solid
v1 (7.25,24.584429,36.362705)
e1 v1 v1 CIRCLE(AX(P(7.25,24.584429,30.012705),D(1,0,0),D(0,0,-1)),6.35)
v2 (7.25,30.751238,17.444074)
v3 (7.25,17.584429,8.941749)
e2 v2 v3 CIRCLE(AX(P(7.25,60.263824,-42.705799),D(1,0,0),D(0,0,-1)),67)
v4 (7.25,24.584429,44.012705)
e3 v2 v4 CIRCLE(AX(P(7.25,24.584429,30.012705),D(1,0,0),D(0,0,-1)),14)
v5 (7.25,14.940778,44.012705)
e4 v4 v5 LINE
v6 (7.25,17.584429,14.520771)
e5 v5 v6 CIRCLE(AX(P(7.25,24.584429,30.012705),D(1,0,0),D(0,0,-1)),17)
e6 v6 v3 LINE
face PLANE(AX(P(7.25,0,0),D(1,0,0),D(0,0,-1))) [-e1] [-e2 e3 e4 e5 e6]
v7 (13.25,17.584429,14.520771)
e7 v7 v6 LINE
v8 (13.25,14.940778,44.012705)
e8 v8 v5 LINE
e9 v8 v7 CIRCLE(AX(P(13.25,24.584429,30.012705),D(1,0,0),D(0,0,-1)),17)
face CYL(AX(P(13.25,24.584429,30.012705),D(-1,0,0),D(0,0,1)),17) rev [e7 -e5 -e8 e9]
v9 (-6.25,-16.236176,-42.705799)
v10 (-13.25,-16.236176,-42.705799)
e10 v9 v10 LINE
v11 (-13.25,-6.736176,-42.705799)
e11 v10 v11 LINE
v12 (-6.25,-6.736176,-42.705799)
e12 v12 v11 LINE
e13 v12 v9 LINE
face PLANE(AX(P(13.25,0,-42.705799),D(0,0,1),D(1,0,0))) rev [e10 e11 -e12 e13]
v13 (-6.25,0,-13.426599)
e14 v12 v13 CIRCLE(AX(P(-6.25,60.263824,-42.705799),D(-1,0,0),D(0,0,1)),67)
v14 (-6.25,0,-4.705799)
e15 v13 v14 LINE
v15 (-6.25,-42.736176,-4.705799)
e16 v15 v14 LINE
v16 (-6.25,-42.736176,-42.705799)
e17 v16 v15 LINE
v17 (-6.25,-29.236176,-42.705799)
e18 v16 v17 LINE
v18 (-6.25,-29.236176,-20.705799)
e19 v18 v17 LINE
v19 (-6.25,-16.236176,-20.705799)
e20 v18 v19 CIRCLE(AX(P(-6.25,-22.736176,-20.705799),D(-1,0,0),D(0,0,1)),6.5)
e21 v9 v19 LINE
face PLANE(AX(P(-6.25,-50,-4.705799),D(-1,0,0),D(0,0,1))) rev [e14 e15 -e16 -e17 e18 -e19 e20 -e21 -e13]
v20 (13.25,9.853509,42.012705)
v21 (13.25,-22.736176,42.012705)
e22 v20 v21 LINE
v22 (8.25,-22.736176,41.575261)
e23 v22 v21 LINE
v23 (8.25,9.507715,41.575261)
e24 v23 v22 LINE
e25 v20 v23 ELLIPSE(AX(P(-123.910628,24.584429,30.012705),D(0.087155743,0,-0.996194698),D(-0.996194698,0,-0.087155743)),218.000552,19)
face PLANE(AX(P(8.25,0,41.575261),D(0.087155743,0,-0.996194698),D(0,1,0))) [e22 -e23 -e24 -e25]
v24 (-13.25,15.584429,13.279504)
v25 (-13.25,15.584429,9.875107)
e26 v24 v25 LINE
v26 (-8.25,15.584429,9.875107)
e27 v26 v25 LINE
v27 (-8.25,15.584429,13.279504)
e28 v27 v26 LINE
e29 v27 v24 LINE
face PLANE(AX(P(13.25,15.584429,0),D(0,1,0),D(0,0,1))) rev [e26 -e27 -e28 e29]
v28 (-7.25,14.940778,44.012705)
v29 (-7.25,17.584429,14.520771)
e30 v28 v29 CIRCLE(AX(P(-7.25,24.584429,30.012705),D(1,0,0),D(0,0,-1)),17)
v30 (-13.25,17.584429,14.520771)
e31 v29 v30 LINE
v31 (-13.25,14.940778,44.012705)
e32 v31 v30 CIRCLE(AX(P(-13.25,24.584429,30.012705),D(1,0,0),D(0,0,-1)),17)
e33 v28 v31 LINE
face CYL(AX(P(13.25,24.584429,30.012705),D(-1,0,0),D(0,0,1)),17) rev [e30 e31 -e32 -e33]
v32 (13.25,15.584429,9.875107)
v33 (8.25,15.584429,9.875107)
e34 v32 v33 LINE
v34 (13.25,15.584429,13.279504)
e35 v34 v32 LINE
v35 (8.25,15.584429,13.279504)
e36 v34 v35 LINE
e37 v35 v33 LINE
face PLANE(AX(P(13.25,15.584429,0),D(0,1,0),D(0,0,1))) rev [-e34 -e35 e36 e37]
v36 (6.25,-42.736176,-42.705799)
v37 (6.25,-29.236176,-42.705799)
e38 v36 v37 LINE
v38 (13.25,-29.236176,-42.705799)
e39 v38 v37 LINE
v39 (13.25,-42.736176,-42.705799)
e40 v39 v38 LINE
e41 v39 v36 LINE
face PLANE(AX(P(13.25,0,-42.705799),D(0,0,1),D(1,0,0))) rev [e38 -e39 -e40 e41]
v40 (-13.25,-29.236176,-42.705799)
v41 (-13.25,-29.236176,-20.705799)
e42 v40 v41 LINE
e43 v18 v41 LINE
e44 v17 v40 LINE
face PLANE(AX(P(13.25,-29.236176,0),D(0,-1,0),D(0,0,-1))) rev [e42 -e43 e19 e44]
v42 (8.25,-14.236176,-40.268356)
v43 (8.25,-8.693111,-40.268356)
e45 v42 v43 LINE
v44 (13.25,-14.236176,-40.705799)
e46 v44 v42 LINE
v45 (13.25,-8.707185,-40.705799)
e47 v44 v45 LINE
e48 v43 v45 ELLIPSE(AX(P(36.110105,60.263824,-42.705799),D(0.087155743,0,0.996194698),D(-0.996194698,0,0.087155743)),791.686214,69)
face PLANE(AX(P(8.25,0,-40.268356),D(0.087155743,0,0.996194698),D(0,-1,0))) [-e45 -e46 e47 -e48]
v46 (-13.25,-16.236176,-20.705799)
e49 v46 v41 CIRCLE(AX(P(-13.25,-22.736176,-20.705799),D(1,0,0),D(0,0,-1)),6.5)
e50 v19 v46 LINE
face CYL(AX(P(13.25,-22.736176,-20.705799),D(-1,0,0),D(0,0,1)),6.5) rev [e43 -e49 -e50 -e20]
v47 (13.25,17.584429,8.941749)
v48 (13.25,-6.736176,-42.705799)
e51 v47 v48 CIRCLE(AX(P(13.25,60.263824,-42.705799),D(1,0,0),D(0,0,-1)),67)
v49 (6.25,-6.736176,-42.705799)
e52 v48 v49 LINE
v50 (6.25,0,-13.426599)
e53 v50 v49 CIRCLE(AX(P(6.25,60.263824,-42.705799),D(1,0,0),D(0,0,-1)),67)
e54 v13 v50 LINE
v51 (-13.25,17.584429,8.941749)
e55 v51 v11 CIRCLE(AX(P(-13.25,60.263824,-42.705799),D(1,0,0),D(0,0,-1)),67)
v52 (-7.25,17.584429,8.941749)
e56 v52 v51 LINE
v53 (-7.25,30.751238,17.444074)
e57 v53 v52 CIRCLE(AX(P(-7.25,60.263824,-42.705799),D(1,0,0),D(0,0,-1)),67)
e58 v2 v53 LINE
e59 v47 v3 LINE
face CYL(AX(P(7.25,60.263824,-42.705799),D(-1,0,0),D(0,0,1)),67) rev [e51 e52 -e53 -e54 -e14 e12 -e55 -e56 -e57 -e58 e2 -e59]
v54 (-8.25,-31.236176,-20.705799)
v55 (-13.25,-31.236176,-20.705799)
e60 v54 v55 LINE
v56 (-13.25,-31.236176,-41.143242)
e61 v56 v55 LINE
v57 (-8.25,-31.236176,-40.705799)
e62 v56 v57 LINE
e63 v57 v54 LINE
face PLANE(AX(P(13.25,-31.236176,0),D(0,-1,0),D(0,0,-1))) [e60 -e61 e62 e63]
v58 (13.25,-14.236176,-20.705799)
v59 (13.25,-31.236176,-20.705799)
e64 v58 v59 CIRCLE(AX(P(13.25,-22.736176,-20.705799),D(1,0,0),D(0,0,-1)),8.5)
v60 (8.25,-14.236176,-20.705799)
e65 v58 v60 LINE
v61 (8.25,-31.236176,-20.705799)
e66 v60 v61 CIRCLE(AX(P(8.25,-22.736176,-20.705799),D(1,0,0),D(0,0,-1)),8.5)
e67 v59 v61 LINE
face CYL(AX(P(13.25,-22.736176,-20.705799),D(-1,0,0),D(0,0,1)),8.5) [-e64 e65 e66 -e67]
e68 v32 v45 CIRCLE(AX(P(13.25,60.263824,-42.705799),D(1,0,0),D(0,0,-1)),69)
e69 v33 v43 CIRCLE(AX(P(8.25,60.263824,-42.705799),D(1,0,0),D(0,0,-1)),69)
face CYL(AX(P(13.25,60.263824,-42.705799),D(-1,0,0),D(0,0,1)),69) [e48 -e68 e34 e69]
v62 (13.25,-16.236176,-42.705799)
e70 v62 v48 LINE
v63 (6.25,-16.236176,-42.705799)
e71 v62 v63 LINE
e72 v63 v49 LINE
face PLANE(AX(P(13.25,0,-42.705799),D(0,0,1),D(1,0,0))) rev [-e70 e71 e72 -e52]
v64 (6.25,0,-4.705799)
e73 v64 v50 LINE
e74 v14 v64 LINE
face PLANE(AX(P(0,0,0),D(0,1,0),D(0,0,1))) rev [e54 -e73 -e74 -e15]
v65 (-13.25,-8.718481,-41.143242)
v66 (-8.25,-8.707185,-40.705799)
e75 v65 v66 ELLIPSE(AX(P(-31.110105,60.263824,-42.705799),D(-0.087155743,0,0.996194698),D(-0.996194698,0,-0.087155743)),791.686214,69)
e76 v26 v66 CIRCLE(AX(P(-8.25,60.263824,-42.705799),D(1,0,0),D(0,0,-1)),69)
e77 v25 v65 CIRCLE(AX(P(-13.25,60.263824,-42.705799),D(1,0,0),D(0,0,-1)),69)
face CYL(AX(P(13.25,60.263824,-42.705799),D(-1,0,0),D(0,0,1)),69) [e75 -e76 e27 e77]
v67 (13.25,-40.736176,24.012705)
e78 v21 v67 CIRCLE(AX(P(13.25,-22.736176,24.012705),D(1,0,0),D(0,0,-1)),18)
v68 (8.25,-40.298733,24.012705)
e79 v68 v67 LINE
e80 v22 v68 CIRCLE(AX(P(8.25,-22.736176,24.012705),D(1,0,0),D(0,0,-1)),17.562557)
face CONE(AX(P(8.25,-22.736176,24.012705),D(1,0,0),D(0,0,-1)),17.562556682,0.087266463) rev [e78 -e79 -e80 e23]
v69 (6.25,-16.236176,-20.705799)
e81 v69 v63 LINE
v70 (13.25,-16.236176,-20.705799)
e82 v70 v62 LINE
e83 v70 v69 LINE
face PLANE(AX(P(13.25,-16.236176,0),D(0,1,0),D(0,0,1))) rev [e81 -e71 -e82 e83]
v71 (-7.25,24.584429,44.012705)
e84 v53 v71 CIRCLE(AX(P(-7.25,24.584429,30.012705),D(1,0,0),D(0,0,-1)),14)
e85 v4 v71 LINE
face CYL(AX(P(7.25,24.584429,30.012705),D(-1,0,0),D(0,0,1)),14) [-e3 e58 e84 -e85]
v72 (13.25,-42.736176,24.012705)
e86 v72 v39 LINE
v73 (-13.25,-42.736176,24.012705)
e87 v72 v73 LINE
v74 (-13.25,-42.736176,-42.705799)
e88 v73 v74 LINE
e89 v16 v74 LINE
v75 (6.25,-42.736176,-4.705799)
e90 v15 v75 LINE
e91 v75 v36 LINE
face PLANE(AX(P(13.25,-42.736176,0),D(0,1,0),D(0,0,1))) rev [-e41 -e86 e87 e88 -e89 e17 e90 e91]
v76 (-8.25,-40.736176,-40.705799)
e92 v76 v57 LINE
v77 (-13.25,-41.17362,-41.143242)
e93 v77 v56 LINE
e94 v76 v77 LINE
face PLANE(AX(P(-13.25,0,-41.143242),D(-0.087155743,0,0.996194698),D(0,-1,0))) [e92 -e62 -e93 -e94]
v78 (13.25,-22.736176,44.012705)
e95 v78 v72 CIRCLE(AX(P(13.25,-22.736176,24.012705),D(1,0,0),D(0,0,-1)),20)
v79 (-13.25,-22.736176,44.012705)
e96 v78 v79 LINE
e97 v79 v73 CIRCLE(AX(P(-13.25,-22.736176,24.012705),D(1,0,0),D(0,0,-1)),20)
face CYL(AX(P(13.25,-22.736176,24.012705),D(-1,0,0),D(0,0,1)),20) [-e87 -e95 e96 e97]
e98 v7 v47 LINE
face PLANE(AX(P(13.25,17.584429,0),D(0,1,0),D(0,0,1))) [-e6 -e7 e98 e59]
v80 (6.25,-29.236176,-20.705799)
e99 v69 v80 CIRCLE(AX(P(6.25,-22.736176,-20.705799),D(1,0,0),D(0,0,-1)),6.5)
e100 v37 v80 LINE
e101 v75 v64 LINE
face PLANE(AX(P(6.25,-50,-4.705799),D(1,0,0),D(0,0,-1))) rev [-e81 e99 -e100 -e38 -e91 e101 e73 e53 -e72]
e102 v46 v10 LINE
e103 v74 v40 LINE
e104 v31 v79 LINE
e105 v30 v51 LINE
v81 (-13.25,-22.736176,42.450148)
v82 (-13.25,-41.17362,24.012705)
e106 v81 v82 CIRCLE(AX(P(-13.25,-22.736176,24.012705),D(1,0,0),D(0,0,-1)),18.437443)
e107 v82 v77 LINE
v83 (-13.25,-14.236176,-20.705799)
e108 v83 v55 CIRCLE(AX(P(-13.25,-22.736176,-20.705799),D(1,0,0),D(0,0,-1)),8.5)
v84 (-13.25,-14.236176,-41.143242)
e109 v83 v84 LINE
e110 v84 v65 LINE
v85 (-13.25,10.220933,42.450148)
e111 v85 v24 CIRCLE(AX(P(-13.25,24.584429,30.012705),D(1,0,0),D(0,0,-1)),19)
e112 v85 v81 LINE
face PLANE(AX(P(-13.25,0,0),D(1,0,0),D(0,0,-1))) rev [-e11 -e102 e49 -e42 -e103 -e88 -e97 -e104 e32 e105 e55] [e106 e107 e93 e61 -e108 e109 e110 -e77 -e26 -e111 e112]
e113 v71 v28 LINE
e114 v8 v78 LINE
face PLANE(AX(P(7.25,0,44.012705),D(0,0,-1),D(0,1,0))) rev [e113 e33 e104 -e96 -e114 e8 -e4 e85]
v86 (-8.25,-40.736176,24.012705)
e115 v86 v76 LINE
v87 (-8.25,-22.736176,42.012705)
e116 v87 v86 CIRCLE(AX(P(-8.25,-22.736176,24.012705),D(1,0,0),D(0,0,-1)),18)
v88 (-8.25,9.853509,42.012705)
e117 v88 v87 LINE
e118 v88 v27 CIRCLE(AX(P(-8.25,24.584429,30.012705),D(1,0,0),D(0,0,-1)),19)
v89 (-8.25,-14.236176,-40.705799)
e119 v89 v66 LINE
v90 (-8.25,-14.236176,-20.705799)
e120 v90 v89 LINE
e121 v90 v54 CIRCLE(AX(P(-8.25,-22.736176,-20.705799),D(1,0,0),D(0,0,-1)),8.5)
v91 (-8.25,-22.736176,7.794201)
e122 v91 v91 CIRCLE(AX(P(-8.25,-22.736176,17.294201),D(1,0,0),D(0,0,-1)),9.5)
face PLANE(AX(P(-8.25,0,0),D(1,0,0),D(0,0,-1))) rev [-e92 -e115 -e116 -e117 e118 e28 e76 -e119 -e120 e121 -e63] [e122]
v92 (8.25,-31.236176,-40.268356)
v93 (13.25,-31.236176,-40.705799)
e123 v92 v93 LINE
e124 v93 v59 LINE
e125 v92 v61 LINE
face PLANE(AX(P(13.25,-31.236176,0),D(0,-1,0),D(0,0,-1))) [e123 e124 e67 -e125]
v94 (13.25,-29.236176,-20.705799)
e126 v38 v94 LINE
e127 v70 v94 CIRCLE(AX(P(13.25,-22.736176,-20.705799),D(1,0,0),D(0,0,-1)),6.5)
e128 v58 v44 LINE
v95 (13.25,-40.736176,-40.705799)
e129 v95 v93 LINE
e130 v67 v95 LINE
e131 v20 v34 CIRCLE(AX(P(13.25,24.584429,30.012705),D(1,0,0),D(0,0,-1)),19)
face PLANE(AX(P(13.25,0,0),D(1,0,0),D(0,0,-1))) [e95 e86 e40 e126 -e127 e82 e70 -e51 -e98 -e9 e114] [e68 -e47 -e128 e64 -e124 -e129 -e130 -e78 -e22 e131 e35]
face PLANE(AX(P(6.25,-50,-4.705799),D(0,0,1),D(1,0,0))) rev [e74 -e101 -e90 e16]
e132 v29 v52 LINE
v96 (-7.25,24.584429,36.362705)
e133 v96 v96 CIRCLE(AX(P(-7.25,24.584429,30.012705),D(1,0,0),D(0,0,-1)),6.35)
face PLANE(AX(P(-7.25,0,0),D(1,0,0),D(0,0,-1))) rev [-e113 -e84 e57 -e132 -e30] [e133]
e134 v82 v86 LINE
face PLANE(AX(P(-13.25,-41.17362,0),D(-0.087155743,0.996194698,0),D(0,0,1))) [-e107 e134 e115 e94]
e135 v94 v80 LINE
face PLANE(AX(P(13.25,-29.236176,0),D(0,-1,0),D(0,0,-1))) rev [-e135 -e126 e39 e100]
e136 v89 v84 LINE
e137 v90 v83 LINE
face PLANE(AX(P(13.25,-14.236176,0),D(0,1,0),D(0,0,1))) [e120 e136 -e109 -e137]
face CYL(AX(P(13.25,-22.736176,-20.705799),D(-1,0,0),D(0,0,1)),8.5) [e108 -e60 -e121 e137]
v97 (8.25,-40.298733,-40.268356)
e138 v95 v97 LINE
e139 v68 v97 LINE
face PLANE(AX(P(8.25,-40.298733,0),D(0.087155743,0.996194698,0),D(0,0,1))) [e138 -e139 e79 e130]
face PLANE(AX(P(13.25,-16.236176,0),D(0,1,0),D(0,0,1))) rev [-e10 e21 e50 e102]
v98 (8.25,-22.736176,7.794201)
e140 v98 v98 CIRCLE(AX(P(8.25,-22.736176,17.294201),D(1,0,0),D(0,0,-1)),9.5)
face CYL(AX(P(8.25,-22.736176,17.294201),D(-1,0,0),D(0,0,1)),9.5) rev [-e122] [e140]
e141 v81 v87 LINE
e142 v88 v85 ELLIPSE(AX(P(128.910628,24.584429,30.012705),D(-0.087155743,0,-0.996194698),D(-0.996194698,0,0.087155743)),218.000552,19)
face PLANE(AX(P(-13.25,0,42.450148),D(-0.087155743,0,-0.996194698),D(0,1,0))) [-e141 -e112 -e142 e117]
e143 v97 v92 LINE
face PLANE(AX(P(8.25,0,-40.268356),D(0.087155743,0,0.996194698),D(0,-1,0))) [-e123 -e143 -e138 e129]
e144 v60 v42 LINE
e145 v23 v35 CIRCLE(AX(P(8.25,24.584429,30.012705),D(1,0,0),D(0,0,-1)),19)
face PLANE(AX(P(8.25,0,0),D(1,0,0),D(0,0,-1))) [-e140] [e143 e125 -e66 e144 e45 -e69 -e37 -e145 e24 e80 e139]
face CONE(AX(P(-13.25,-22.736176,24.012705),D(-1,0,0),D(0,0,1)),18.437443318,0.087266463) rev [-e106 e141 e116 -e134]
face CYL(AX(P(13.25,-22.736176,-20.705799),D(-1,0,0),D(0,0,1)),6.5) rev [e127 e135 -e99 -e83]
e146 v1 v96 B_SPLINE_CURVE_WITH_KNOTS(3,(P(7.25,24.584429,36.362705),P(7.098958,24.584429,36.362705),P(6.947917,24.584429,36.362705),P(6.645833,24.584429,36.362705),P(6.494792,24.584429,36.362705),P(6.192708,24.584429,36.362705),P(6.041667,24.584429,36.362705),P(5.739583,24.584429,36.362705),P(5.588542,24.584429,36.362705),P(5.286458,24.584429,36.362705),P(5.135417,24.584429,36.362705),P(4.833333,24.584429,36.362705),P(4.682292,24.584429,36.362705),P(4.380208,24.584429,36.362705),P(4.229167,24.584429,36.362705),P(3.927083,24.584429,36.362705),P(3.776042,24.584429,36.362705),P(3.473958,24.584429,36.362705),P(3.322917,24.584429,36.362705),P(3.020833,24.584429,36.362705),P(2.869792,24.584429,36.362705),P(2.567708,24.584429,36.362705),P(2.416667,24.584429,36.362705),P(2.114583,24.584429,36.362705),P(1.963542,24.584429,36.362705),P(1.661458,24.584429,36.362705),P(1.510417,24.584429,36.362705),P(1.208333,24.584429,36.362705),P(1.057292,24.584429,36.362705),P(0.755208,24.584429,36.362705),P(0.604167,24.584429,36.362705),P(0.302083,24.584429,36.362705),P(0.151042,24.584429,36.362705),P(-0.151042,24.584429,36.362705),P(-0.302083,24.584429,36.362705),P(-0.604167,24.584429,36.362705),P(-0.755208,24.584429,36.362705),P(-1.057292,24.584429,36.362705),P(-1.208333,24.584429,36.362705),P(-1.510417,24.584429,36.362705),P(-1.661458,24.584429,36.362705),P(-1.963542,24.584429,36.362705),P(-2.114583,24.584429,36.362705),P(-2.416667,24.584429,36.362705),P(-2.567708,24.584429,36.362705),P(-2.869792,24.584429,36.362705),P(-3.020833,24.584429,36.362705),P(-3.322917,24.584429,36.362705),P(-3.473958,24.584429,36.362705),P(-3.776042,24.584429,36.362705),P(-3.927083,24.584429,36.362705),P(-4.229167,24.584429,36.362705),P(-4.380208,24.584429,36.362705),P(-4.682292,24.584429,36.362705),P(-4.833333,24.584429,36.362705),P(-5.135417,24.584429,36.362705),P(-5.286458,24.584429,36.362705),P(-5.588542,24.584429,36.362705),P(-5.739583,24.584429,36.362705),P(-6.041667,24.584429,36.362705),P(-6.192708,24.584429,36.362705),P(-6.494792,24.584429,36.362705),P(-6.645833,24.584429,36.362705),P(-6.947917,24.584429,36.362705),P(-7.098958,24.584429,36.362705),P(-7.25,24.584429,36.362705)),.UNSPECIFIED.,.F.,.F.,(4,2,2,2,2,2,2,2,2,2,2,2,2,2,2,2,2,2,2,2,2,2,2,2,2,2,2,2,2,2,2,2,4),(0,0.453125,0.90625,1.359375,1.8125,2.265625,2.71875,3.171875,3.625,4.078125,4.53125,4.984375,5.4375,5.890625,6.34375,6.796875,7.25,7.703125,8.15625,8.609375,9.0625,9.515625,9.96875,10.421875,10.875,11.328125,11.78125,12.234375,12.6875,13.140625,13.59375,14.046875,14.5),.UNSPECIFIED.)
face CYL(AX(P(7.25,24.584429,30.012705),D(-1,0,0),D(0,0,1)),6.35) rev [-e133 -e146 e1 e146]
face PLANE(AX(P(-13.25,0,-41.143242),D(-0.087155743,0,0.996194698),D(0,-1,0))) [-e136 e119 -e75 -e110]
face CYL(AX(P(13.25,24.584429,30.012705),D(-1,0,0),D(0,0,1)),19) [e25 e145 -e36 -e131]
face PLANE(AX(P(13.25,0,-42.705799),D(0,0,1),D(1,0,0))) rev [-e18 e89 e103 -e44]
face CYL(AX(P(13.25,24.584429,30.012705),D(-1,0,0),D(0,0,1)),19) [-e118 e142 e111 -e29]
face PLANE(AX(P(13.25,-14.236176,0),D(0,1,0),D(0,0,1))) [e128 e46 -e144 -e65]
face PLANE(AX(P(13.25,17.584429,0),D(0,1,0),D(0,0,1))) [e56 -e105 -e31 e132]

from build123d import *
from OCP.BRepFilletAPI import BRepFilletAPI_MakeChamfer

# Parameters (mm, degrees)
SKETCH2_R           = 6.35
BOSS_EXTRUDE1_DEPTH = 7.25
BOSS_EXTRUDE2_DEPTH = 13.25
SKETCH2_4_R         = 9.5
BOSS_EXTRUDE3_DEPTH = 8.25
CHAMFER1_SIZE       = 0.437443318
CHAMFER1_SIZE_2     = 5
SKETCH3_W           = 12.5
SKETCH3_H           = 38
CUT_EXTRUDE1_DEPTH  = 50


with BuildPart() as part:
    # Sketch2 → Boss-Extrude1 (new, symmetric)
    with BuildSketch(Plane(origin=(0, 0, 0), x_dir=(0, 0, -1), z_dir=(1, 0, 0))):
        with BuildLine():
            ThreePointArc((-17.444074423, 30.751237722), (-33.17807799, 38.221892264), (-44.012704688, 24.584428722))
            Line((-44.012704688, 24.584428722), (-44.012704688, 14.940777961))
            ThreePointArc((-44.012704688, 14.940777961), (-43.308060102, 13.990396231), (-42.539020478, 13.091325888))
            ThreePointArc((-42.539020478, 13.091325888), (-27.32091807, 7.798890756), (-14.520771303, 17.584428722))
            Line((-14.520771303, 17.584428722), (-8.941749337, 17.584428722))
            ThreePointArc((-8.941749337, 17.584428722), (-13.579253126, 23.918357524), (-17.444074423, 30.751237722))
        make_face()
        with Locations(Location((-30.012704688, 24.584428722, 0), (0, 0, 180))):
            Circle(SKETCH2_R, mode=Mode.SUBTRACT)
    extrude(amount=BOSS_EXTRUDE1_DEPTH, both=True)

    # Sketch2<3> → Boss-Extrude2 (add, symmetric)
    with BuildSketch(Plane(origin=(0, 0, 0), x_dir=(0, 0, -1), z_dir=(1, 0, 0))):
        with BuildLine():
            ThreePointArc((-42.539020478, 13.091325888), (-43.308060102, 13.990396231), (-44.012704688, 14.940777961))
            Line((-44.012704688, 14.940777961), (-44.012704688, -22.736176348))
            ThreePointArc((-44.012704688, -22.736176348), (-38.154840312, -36.878311972), (-24.012704688, -42.736176348))
            Line((-24.012704688, -42.736176348), (42.705798991, -42.736176348))
            Line((42.705798991, -42.736176348), (42.705798991, -29.236176348))
            Line((42.705798991, -29.236176348), (20.705798991, -29.236176348))
            ThreePointArc((20.705798991, -29.236176348), (14.205798991, -22.736176348), (20.705798991, -16.236176348))
            Line((20.705798991, -16.236176348), (42.705798991, -16.236176348))
            Line((42.705798991, -16.236176348), (42.705798991, -6.736176348))
            ThreePointArc((42.705798991, -6.736176348), (14.162143482, -0.351848663), (-8.941749337, 17.584428722))
            Line((-8.941749337, 17.584428722), (-14.520771303, 17.584428722))
            ThreePointArc((-14.520771303, 17.584428722), (-27.32091807, 7.798890756), (-42.539020478, 13.091325888))
        make_face()
        with BuildLine():
            ThreePointArc((-42.012704688, 9.853508859), (-26.296300857, 5.951438018), (-13.279504157, 15.584428722))
            Line((-13.279504157, 15.584428722), (-9.875106941, 15.584428722))
            ThreePointArc((-9.875106941, 15.584428722), (12.834584681, -1.93513579), (40.705798991, -8.70718475))
            Line((40.705798991, -8.70718475), (40.705798991, -14.236176348))
            Line((40.705798991, -14.236176348), (20.705798991, -14.236176348))
            ThreePointArc((20.705798991, -14.236176348), (12.205798991, -22.736176348), (20.705798991, -31.236176348))
            Line((20.705798991, -31.236176348), (40.705798991, -31.236176348))
            Line((40.705798991, -31.236176348), (40.705798991, -40.736176348))
            Line((40.705798991, -40.736176348), (-24.012704688, -40.736176348))
            ThreePointArc((-24.012704688, -40.736176348), (-36.74062675, -35.464098409), (-42.012704688, -22.736176348))
            Line((-42.012704688, -22.736176348), (-42.012704688, 9.853508859))
        make_face(mode=Mode.SUBTRACT)
    extrude(amount=BOSS_EXTRUDE2_DEPTH, both=True)

    # Sketch2<4> → Boss-Extrude3 (add, symmetric)
    with BuildSketch(Plane(origin=(0, 0, 0), x_dir=(0, 0, -1), z_dir=(1, 0, 0))):
        with BuildLine():
            Line((-42.012704688, 9.853508859), (-42.012704688, -22.736176348))
            ThreePointArc((-42.012704688, -22.736176348), (-36.74062675, -35.464098409), (-24.012704688, -40.736176348))
            Line((-24.012704688, -40.736176348), (40.705798991, -40.736176348))
            Line((40.705798991, -40.736176348), (40.705798991, -31.236176348))
            Line((40.705798991, -31.236176348), (20.705798991, -31.236176348))
            ThreePointArc((20.705798991, -31.236176348), (12.205798991, -22.736176348), (20.705798991, -14.236176348))
            Line((20.705798991, -14.236176348), (40.705798991, -14.236176348))
            Line((40.705798991, -14.236176348), (40.705798991, -8.70718475))
            ThreePointArc((40.705798991, -8.70718475), (12.834584681, -1.93513579), (-9.875106941, 15.584428722))
            Line((-9.875106941, 15.584428722), (-13.279504157, 15.584428722))
            ThreePointArc((-13.279504157, 15.584428722), (-26.296300857, 5.951438018), (-42.012704688, 9.853508859))
        make_face()
        with Locations((-17.294201009, -22.736176348)):
            Circle(SKETCH2_4_R, mode=Mode.SUBTRACT)
    extrude(amount=BOSS_EXTRUDE3_DEPTH, both=True)

    # Chamfer1
    chamfer1_edges_1 = [part.edges().sort_by_distance(p)[0] for p in [
        (-13.25, -40.736176348, -8.346547152),
    ]]
    chamfer1_side_1 = [part.faces().sort_by_distance(p)[0] for p in [
        (-13.25, -40.744925214, -8.346547152),
    ]]
    chamfer1_edges_2 = [part.edges().sort_by_distance(p)[0] for p in [
        (-13.25, -35.464098409, 36.74062675),
    ]]
    chamfer1_side_2 = [part.faces().sort_by_distance(p)[0] for p in [
        (-13.25, -35.470284792, 36.746813132),
    ]]
    chamfer1_edges_3 = [part.edges().sort_by_distance(p)[0] for p in [
        (-13.25, -6.441333744, 42.012704688),
    ]]
    chamfer1_side_3 = [part.faces().sort_by_distance(p)[0] for p in [
        (-13.25, -6.441333744, 42.021453555),
    ]]
    chamfer1_edges_4 = [part.edges().sort_by_distance(p)[0] for p in [
        (8.25, -40.736176348, -8.346547152),
    ]]
    chamfer1_side_4 = [part.faces().sort_by_distance(p)[0] for p in [
        (8.258748866, -40.736176348, -8.346547152),
    ]]
    chamfer1_edges_5 = [part.edges().sort_by_distance(p)[0] for p in [
        (8.25, -35.464098409, 36.74062675),
    ]]
    chamfer1_side_5 = [part.faces().sort_by_distance(p)[0] for p in [
        (8.258748866, -35.464098409, 36.74062675),
    ]]
    chamfer1_edges_6 = [part.edges().sort_by_distance(p)[0] for p in [
        (8.25, -6.441333744, 42.012704688),
    ]]
    chamfer1_side_6 = [part.faces().sort_by_distance(p)[0] for p in [
        (8.258748866, -6.441333744, 42.012704688),
    ]]
    chamfer1_edges_7 = [part.edges().sort_by_distance(p)[0] for p in [
        (-13.25, -35.986176348, -40.705798991),
    ]]
    chamfer1_side_7 = [part.faces().sort_by_distance(p)[0] for p in [
        (-13.25, -35.986176348, -40.714547858),
    ]]
    chamfer1_edges_8 = [part.edges().sort_by_distance(p)[0] for p in [
        (-13.25, -11.471680549, -40.705798991),
    ]]
    chamfer1_side_8 = [part.faces().sort_by_distance(p)[0] for p in [
        (-13.25, -11.471680549, -40.714547858),
    ]]
    chamfer1_edges_9 = [part.edges().sort_by_distance(p)[0] for p in [
        (8.25, -35.986176348, -40.705798991),
    ]]
    chamfer1_side_9 = [part.faces().sort_by_distance(p)[0] for p in [
        (8.258748866, -35.986176348, -40.705798991),
    ]]
    chamfer1_edges_10 = [part.edges().sort_by_distance(p)[0] for p in [
        (8.25, -11.471680549, -40.705798991),
    ]]
    chamfer1_side_10 = [part.faces().sort_by_distance(p)[0] for p in [
        (8.258748866, -11.471680549, -40.705798991),
    ]]
    chamfer1 = BRepFilletAPI_MakeChamfer(part.part.solid().wrapped)
    for e in chamfer1_edges_1:
        chamfer1.Add(CHAMFER1_SIZE - 0.0001, CHAMFER1_SIZE_2 - 0.0001, e.wrapped, chamfer1_side_1[0].wrapped)
    for e in chamfer1_edges_2:
        chamfer1.Add(CHAMFER1_SIZE - 0.0001, CHAMFER1_SIZE_2 - 0.0001, e.wrapped, chamfer1_side_2[0].wrapped)
    for e in chamfer1_edges_3:
        chamfer1.Add(CHAMFER1_SIZE - 0.0001, CHAMFER1_SIZE_2 - 0.0001, e.wrapped, chamfer1_side_3[0].wrapped)
    for e in chamfer1_edges_4:
        chamfer1.Add(CHAMFER1_SIZE_2 - 0.0001, CHAMFER1_SIZE - 0.0001, e.wrapped, chamfer1_side_4[0].wrapped)
    for e in chamfer1_edges_5:
        chamfer1.Add(CHAMFER1_SIZE_2 - 0.0001, CHAMFER1_SIZE - 0.0001, e.wrapped, chamfer1_side_5[0].wrapped)
    for e in chamfer1_edges_6:
        chamfer1.Add(CHAMFER1_SIZE_2 - 0.0001, CHAMFER1_SIZE - 0.0001, e.wrapped, chamfer1_side_6[0].wrapped)
    for e in chamfer1_edges_7:
        chamfer1.Add(CHAMFER1_SIZE - 0.0001, CHAMFER1_SIZE_2 - 0.0001, e.wrapped, chamfer1_side_7[0].wrapped)
    for e in chamfer1_edges_8:
        chamfer1.Add(CHAMFER1_SIZE - 0.0001, CHAMFER1_SIZE_2 - 0.0001, e.wrapped, chamfer1_side_8[0].wrapped)
    for e in chamfer1_edges_9:
        chamfer1.Add(CHAMFER1_SIZE_2 - 0.0001, CHAMFER1_SIZE - 0.0001, e.wrapped, chamfer1_side_9[0].wrapped)
    for e in chamfer1_edges_10:
        chamfer1.Add(CHAMFER1_SIZE_2 - 0.0001, CHAMFER1_SIZE - 0.0001, e.wrapped, chamfer1_side_10[0].wrapped)
    add(Compound.cast(chamfer1.Shape()), mode=Mode.REPLACE)  # a hair under: the kernel refuses the full size

    # Sketch3 → Cut-Extrude1 (cut)
    with BuildSketch(Plane(origin=(0, 0, 0), x_dir=(1, 0, 0), z_dir=(0, 1, 0))):
        with Locations((0, 23.705798991)):
            Rectangle(SKETCH3_W, SKETCH3_H)
    extrude(amount=-CUT_EXTRUDE1_DEPTH, mode=Mode.SUBTRACT)


solid = part.part
